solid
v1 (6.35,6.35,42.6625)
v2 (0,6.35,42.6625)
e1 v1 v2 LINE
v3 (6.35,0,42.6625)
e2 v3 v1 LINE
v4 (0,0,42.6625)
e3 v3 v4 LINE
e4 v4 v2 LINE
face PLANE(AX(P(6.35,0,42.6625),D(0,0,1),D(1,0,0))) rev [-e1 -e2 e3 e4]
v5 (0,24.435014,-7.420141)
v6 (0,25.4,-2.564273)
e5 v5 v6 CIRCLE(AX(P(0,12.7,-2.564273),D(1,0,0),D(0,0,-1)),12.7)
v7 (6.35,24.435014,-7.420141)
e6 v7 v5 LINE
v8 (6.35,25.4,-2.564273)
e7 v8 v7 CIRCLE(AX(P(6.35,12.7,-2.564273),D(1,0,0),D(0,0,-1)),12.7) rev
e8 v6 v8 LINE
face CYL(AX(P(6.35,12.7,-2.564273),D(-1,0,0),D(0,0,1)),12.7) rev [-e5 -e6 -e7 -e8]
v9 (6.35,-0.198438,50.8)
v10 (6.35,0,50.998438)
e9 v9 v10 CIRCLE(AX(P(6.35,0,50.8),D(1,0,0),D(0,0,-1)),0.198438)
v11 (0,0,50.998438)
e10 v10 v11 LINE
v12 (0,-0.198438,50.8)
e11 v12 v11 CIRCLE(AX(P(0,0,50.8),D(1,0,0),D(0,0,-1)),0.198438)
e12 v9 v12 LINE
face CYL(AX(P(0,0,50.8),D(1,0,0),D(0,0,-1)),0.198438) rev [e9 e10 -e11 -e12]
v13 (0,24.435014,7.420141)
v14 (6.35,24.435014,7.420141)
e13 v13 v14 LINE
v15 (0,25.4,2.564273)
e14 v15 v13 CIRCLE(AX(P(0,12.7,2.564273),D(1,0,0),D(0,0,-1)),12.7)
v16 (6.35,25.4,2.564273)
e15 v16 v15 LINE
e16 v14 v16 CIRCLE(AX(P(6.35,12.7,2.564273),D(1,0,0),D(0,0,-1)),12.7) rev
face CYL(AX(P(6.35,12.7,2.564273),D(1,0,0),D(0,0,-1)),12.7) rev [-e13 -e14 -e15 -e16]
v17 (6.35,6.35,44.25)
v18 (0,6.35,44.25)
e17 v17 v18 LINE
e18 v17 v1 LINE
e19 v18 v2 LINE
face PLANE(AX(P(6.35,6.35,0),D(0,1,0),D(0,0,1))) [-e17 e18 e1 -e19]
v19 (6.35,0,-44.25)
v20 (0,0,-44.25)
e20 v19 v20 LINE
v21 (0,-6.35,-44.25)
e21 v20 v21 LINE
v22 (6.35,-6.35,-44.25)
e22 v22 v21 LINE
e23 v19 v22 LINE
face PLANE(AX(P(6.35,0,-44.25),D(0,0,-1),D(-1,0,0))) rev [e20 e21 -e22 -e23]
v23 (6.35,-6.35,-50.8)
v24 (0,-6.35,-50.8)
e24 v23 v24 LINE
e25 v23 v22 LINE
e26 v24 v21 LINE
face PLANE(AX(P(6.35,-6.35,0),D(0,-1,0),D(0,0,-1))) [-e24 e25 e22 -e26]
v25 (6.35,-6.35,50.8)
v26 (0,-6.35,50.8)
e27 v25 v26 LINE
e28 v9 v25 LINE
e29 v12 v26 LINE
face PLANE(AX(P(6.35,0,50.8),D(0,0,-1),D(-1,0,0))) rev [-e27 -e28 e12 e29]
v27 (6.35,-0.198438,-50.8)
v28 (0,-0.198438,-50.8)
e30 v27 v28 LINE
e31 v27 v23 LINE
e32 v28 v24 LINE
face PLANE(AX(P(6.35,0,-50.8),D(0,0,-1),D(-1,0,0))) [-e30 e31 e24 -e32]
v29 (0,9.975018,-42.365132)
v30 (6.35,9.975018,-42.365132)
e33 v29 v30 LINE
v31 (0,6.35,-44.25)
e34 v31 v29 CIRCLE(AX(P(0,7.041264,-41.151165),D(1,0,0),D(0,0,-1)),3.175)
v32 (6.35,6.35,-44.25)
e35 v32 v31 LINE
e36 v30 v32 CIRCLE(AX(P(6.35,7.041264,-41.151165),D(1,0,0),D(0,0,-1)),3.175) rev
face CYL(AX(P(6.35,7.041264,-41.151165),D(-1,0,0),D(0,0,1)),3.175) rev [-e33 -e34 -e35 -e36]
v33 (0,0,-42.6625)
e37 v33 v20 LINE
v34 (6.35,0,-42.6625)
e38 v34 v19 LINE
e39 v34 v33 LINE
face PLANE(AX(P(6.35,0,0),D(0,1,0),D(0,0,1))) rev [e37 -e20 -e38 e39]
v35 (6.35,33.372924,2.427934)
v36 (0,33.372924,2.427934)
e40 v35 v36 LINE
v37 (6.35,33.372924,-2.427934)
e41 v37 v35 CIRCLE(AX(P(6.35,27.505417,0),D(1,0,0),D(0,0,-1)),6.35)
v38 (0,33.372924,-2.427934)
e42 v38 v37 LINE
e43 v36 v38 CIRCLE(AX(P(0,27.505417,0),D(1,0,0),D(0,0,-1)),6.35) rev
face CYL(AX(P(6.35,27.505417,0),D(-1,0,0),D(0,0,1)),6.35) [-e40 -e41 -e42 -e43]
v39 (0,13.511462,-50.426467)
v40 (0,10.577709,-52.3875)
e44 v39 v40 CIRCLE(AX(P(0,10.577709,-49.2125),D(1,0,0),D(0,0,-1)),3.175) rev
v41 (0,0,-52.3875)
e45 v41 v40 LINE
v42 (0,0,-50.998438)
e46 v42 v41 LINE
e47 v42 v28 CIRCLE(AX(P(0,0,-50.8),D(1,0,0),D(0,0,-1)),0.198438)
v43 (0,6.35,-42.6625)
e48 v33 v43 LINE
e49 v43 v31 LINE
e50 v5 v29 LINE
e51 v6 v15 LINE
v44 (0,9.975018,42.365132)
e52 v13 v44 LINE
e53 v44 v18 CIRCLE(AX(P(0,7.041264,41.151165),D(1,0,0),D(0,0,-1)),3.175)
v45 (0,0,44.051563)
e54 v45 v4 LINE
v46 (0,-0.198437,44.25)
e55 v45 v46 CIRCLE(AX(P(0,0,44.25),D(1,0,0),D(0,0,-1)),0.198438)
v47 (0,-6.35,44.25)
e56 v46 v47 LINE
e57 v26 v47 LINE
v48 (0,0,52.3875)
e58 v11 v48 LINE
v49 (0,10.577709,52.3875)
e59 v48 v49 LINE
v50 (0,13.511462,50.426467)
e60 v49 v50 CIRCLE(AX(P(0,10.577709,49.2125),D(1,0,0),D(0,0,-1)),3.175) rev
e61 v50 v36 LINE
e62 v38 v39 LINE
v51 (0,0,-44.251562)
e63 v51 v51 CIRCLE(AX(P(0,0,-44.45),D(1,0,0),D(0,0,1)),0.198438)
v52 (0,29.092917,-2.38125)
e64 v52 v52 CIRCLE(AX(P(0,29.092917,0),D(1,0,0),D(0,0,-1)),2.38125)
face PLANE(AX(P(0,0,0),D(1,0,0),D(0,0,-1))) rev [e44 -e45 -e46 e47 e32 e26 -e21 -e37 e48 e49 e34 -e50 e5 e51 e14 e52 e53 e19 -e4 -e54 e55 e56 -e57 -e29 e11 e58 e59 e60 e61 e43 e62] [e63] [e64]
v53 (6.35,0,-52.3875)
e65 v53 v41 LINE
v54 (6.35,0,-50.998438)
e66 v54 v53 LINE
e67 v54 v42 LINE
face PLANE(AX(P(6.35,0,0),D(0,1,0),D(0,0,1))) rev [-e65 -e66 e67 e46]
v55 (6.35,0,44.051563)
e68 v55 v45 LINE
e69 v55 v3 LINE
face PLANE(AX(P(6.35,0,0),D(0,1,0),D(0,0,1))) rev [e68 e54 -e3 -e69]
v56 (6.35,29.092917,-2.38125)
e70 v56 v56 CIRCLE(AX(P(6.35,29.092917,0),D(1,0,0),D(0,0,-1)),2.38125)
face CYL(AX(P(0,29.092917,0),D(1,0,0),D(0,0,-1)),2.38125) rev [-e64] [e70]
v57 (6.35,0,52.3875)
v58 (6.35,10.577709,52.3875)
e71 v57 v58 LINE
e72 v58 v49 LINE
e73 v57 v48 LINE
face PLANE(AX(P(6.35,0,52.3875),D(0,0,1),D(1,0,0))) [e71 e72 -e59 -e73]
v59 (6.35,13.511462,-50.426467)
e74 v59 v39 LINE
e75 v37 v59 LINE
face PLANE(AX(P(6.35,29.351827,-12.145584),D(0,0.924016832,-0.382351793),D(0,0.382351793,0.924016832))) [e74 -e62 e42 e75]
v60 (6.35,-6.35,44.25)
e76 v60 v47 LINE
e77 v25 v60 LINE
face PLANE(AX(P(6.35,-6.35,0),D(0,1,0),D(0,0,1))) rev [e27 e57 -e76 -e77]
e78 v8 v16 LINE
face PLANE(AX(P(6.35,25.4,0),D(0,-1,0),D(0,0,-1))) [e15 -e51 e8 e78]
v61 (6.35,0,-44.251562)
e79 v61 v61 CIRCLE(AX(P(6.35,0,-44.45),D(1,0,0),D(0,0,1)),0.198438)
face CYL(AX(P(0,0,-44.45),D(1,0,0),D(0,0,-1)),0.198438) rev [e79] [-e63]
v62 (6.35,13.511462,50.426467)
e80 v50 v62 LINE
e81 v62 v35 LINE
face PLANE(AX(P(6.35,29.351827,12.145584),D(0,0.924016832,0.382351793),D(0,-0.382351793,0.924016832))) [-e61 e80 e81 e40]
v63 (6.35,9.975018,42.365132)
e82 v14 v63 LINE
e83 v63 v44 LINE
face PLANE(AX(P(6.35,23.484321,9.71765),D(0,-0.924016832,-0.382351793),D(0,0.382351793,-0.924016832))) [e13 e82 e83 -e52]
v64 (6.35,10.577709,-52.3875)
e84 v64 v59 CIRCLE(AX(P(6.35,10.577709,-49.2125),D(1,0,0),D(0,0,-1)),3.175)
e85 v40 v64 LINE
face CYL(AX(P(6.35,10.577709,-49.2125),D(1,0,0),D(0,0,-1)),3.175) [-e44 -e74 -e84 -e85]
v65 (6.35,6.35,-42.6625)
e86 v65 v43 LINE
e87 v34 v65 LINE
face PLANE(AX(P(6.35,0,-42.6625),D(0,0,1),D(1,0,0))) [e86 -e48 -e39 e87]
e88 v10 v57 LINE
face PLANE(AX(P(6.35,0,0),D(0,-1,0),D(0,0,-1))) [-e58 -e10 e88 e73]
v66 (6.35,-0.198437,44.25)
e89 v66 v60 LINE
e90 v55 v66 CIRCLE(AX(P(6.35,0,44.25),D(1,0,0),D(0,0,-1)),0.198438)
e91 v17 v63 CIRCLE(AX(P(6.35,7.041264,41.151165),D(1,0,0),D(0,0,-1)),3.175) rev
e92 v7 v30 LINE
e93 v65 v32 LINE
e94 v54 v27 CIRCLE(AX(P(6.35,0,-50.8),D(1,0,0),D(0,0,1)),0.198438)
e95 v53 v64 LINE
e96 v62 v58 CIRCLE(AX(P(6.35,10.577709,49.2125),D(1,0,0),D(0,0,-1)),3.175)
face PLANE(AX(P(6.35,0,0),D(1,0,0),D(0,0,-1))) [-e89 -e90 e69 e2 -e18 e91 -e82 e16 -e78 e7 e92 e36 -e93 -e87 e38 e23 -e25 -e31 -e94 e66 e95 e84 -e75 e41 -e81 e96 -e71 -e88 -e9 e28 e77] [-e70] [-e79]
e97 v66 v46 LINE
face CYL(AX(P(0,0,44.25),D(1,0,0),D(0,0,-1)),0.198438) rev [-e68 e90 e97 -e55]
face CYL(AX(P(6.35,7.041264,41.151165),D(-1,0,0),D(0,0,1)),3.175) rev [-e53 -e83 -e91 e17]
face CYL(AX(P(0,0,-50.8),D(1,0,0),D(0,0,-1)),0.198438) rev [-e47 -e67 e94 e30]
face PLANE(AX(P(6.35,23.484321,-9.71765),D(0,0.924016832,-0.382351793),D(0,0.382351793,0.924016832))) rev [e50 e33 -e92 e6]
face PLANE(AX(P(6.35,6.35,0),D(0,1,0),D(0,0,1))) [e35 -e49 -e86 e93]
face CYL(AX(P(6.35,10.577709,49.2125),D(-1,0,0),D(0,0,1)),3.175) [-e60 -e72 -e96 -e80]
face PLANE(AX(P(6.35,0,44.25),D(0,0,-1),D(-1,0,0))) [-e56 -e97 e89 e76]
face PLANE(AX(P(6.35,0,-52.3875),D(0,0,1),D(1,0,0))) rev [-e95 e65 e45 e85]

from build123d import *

# Parameters (mm, degrees)
BOSS_EXTRUDE1_DEPTH = 6.35
SKETCH2_R           = 0.1984375
CUT_EXTRUDE1_DEPTH  = 63.980878762
FILLET5_R           = 3.175
FILLET6_R           = 12.7
FILLET7_R           = 6.35
SKETCH5_R           = 2.38125
CUT_EXTRUDE6_DEPTH  = 63.697383663


with BuildPart() as part:
    # Sketch1 → Boss-Extrude1 (new body)
    with BuildSketch(Plane(origin=(0, 0, 0), x_dir=(0, 0, -1), z_dir=(1, 0, 0))):
        Polygon((50.8, -6.35), (50.8, 0), (52.3875, 0), (52.3875, 12.7), (6.35, 31.75), (0, 34.377586207), (-6.35, 31.75), (-52.3875, 12.7), (-52.3875, 0), (-50.8, 0), (-50.8, -6.35), (-44.25, -6.35), (-44.25, 0), (-42.6625, 0), (-42.6625, 6.35), (-44.25, 6.35), (-46.0375, 8.455417024), (-5.088091142, 25.4), (5.088091142, 25.4), (46.0375, 8.455417024), (44.25, 6.35), (42.6625, 6.35), (42.6625, 0), (44.25, 0), (44.25, -6.35), align=None)
    extrude(amount=BOSS_EXTRUDE1_DEPTH)

    # Sketch2 → Cut-Extrude1 (cut, through all)
    with BuildSketch(Plane(origin=(6.35, 0, 0), x_dir=(0, 0, -1), z_dir=(1, 0, 0))):
        with Locations((-50.8, 0)):
            Circle(SKETCH2_R)
        with Locations((-44.25, 0)):
            Circle(SKETCH2_R)
        with Locations(Location((44.45, 0, 0), (0, 0, 180))):
            Circle(SKETCH2_R)
        with Locations((50.8, 0)):
            Circle(SKETCH2_R)
    extrude(amount=-CUT_EXTRUDE1_DEPTH, mode=Mode.SUBTRACT)

    # Fillet5
    # the kernel refuses this fillet: 3.175 mm, written as the material it adds along each edge
    with BuildSketch(Plane(origin=(0, 8.455417024, 46.0375), x_dir=(0, 0.38235179272629993, -0.9240168324218908), z_dir=(1, 0, 0))) as fillet5_piece_1:
        with BuildLine():
            CenterArc((3.974351986, -3.175), FILLET5_R, 90, 80.095777378)
            Line((0.846670114, -2.628894599), (0, 0))
            Line((0, 0), (3.974351986, 0))
        make_face()
    extrude(amount=6.35)
    with BuildSketch(Plane(origin=(0, 8.455417024, -46.0375), x_dir=(0, -0.7623151990147004, 0.6472059466284111), z_dir=(1, 0, 0))) as fillet5_piece_2:
        with BuildLine():
            CenterArc((4.240495318, -2.80967937), FILLET5_R, 117.756060194, 80.095777378)
            Line((1.218363855, -3.782996593), (0, 0))
            Line((0, 0), (2.761872027, 0))
        make_face()
    extrude(amount=6.35)
    # the kernel refuses this fillet: 3.175 mm, written as the material it takes off along each edge
    with BuildSketch(Plane(origin=(-5.30572872, 12.7, -52.3875), x_dir=(0, -1, 0), z_dir=(1, 0, 0)), Plane(origin=(-5.30572872, 12.7, 52.3875), x_dir=(0, 0.38235179272628034, -0.9240168324218988), z_dir=(1, 0, 0))) as fillet5_2_piece_1:
        with BuildLine():
            CenterArc((FILLET5_R * 0.668438263895, -FILLET5_R), FILLET5_R, 90, 67.520565603)
            Line((-FILLET5_R * 0.255578568527, -FILLET5_R * 0.617648207274), (0, 0))
            Line((0, 0), (FILLET5_R * 0.668438263895, 0))
        make_face()
    extrude(amount=16.961457439, mode=Mode.SUBTRACT)

    # Fillet6
    fillet6_edges = [part.edges().sort_by_distance(p)[0] for p in [
        (3.175, 25.4, -5.088091142),
        (3.175, 25.4, 5.088091142),
    ]]
    fillet(fillet6_edges, radius=FILLET6_R)

    # Fillet7
    fillet7_edges = [part.edges().sort_by_distance(p)[0] for p in [
        (3.175, 34.377586207, 0),
    ]]
    fillet(fillet7_edges, radius=FILLET7_R)

    # Sketch5 → Cut-Extrude6 (cut, through all)
    with BuildSketch(Plane(origin=(6.35, 0, 0), x_dir=(0, 0, -1), z_dir=(1, 0, 0))):
        with Locations((0, 29.092917024)):
            Circle(SKETCH5_R)
    extrude(amount=-CUT_EXTRUDE6_DEPTH, mode=Mode.SUBTRACT)


solid = part.part
